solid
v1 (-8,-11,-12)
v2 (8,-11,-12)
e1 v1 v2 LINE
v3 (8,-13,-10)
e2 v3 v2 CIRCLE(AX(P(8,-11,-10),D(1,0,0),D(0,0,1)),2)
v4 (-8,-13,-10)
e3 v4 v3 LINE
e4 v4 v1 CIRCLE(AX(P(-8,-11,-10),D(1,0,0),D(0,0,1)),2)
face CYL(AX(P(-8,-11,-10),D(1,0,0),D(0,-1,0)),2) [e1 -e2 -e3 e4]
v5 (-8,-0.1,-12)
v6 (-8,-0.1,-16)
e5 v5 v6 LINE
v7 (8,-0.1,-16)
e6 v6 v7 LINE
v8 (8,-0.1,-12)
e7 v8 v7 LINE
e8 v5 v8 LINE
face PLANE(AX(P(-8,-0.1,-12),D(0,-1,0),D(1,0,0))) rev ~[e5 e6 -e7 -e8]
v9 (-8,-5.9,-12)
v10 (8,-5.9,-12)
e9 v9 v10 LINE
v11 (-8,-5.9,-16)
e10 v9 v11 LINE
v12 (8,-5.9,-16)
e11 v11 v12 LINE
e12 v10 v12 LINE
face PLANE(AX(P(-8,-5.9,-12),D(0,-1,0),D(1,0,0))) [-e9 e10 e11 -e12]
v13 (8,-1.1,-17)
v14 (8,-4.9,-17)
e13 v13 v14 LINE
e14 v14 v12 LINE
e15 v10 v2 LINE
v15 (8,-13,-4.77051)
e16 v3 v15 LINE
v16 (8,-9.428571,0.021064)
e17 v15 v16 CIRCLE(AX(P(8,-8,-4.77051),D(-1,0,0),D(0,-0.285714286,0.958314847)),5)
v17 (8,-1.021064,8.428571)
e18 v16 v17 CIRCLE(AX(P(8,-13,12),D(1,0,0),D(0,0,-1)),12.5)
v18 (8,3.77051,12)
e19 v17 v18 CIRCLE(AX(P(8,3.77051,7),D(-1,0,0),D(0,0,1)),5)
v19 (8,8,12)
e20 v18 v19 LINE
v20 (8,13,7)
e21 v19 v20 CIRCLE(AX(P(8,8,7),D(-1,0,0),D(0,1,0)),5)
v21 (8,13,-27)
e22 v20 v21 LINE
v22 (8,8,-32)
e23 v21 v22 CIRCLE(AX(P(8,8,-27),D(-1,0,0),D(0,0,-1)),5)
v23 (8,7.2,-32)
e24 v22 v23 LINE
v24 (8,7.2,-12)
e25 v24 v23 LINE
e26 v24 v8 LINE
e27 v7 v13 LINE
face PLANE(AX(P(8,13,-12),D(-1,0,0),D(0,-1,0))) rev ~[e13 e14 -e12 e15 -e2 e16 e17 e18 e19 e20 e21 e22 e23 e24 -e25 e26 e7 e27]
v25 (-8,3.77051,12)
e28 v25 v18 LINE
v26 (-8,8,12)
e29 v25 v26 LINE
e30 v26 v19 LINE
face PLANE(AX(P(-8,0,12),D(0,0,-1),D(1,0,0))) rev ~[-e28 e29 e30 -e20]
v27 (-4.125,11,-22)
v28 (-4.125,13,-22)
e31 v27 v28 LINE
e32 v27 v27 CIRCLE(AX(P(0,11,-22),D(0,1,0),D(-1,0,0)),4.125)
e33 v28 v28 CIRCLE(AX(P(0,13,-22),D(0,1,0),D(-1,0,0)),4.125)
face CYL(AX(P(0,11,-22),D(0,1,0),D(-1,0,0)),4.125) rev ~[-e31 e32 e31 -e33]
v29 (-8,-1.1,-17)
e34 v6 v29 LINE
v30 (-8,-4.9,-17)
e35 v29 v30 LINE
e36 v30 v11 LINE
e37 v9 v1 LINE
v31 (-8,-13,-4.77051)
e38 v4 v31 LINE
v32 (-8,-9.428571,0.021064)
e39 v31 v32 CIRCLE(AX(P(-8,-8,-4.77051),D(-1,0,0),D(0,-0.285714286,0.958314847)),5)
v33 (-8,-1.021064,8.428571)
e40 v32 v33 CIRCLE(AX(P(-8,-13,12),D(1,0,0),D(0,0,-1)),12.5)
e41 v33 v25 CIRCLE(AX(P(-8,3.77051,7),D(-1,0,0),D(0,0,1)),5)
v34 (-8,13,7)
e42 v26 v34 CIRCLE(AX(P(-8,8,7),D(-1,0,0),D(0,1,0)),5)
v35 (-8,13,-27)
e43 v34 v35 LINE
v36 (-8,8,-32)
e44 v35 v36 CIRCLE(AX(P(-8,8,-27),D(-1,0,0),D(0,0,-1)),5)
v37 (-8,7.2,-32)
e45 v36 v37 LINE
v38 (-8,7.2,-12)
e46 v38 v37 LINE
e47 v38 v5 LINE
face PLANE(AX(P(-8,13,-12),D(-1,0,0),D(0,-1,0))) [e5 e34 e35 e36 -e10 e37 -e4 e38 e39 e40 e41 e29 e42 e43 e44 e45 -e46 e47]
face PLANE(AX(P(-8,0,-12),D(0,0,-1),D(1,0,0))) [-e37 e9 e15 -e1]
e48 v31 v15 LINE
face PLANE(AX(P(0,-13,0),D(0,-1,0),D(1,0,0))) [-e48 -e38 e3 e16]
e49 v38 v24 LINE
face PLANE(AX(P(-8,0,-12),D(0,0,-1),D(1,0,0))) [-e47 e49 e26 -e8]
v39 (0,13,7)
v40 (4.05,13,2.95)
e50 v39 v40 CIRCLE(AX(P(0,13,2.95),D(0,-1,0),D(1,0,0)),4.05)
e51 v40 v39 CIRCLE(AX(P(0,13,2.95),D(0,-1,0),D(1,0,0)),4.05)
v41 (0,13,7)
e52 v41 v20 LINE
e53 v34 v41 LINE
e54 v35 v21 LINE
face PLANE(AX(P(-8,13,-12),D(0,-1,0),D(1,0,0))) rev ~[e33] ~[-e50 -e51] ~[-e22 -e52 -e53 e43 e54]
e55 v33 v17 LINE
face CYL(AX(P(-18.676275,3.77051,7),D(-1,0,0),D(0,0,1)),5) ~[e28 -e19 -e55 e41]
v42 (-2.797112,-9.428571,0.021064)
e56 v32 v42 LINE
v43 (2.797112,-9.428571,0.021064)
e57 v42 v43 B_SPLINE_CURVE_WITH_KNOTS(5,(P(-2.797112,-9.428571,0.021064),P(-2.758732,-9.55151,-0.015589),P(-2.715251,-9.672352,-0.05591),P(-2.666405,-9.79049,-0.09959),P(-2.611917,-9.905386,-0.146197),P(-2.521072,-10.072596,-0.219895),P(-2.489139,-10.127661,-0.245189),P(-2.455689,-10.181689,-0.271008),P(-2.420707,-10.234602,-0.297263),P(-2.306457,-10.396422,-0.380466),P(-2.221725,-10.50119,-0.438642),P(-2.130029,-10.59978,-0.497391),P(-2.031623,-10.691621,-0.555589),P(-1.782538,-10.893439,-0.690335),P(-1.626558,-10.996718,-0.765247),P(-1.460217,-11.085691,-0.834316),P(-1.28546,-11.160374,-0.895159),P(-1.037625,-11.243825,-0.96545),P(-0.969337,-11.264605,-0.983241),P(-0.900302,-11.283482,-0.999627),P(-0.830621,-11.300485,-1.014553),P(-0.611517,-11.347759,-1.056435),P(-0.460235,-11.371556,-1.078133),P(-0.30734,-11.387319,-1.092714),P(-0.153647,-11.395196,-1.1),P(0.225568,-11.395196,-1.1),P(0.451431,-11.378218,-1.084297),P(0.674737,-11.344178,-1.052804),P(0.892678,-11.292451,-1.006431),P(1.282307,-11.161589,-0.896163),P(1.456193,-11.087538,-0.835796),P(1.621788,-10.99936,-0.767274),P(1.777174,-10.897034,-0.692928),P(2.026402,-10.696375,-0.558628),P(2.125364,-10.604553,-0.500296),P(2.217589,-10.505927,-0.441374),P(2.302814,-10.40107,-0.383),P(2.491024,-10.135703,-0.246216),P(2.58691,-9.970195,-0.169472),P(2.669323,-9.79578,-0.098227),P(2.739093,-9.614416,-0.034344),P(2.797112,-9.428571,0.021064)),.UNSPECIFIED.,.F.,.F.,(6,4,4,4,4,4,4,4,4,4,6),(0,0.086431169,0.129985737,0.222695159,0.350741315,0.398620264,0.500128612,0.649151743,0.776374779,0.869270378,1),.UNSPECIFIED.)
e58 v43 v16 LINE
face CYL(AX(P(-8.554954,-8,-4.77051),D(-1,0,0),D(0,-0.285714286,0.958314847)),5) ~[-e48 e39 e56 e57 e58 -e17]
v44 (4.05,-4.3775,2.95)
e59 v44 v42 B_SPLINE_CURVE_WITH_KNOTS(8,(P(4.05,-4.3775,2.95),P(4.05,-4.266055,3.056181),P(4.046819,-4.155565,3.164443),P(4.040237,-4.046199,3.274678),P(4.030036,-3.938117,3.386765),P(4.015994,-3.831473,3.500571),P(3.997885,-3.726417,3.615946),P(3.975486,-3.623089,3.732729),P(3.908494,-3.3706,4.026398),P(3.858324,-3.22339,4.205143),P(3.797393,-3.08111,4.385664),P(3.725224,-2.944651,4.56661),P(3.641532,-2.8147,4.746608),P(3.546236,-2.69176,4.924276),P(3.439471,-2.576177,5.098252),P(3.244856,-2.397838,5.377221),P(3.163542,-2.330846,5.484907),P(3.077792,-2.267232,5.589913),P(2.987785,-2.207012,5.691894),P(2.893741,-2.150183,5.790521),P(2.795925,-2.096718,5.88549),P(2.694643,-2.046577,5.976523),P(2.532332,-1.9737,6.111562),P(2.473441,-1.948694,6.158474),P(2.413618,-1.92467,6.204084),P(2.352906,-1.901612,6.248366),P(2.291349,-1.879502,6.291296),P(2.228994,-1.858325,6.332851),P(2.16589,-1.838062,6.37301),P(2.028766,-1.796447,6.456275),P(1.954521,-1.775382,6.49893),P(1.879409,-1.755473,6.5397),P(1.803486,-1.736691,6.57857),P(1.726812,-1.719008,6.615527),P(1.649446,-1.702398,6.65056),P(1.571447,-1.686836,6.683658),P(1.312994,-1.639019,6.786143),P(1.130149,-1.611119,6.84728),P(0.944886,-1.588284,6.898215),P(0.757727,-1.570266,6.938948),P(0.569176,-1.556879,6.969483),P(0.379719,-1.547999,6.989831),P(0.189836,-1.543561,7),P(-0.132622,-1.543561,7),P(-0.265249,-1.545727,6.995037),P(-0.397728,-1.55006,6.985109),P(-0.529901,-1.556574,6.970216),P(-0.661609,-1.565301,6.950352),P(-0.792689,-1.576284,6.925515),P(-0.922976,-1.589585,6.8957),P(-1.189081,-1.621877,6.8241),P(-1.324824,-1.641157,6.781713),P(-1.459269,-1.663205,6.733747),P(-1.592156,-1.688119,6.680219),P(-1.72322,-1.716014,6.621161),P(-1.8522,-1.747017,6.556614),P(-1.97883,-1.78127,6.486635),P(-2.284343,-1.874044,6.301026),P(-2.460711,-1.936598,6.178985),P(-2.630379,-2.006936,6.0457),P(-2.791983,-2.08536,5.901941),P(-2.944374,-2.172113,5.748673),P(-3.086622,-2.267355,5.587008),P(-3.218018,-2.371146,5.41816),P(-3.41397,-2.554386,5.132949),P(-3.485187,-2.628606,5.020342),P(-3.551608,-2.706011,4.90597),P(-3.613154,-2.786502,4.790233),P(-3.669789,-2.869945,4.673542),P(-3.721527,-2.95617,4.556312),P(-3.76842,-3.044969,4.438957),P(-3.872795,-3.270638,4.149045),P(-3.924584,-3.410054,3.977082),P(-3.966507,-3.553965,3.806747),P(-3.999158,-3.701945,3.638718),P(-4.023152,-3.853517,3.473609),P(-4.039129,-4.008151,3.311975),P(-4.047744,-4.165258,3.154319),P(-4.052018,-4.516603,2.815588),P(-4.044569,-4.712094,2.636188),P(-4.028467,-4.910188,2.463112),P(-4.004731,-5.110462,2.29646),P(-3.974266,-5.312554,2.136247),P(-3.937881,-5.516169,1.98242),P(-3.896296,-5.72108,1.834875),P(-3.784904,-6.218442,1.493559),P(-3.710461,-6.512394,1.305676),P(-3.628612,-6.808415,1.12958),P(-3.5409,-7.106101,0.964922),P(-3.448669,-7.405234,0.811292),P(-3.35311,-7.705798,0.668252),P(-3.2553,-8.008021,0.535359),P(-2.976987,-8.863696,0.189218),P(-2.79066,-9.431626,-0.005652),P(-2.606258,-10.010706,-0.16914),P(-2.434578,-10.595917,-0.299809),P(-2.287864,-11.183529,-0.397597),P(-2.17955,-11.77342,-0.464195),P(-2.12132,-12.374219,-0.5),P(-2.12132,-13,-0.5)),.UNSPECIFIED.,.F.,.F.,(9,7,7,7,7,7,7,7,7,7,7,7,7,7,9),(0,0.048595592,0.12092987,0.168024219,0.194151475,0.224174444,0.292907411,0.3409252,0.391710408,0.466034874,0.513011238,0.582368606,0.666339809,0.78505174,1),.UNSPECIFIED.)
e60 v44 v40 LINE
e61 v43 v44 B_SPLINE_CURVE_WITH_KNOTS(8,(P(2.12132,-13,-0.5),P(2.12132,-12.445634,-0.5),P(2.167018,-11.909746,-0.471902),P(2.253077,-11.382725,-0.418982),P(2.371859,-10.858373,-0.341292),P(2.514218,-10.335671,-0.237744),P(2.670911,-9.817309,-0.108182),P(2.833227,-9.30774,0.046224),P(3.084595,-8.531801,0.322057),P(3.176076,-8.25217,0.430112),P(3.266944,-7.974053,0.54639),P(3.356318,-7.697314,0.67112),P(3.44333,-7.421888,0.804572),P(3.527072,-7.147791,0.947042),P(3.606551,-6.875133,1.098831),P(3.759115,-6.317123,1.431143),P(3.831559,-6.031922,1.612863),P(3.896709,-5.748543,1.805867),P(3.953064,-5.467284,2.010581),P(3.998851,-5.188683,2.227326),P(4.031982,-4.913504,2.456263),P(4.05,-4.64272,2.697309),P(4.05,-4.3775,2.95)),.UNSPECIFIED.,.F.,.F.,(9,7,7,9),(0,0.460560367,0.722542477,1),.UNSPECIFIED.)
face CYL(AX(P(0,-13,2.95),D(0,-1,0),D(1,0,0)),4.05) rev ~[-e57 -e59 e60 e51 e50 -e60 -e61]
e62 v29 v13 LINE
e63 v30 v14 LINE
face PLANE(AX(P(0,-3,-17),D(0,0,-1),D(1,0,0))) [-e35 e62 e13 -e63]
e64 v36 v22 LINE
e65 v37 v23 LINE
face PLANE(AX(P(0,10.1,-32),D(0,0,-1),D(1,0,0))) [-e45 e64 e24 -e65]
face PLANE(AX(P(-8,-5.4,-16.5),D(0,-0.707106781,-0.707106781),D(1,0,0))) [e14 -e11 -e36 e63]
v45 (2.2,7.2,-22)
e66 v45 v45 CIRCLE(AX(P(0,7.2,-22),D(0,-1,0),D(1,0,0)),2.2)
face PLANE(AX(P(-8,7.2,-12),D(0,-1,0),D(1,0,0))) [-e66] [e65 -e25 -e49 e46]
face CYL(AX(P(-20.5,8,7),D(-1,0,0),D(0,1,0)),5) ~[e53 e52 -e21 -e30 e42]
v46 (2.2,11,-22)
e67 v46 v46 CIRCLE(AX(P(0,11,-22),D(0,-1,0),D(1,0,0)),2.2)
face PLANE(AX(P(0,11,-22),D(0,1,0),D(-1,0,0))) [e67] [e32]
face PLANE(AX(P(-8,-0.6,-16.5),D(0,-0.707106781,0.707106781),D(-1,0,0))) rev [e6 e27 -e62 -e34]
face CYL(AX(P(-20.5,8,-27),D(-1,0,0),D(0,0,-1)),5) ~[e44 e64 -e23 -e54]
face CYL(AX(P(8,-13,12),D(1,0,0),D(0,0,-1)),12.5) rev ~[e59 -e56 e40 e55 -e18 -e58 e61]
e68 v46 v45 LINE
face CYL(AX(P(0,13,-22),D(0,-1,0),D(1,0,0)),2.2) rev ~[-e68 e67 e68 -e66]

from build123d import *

# Parameters (mm, degrees)
F0_W           = 16
F0_H           = 24
F1_DEPTH       = 13
F2_W           = 16
F2_H           = 5.8
F3_DEPTH       = 5
F4_DEPTH       = 20
F5_R           = 4.05
F6_DEPTH       = 26.001
F8_D           = 4.4
F8_CBORE_D     = 8.25
F8_CBORE_DEPTH = 2
F9_SIZE        = 1
F11_DEPTH      = 16.001
F12_T1_DEPTH   = 27.2312288127
F12_T3_DEPTH   = 27.2312288127
F12_T5_DEPTH   = 41
F12_T7_DEPTH   = 37.3525491562
F13_R          = 2


# Not quite as in the source:
# - a fillet or chamfer that OpenCascade refuses, or shapes differently, is made with other operations: its cross-section is extruded or revolved along the edge and cut away or added
# - a feature names something its author has since deleted; it is built from what else it names


with BuildPart() as f1:
    # F0 (on Front) → F1 (new body, symmetric)
    with BuildSketch(Plane.XZ):
        Rectangle(F0_W, F0_H)
    extrude(amount=F1_DEPTH, both=True)

    # F2 (on face) → F3 (join)
    with BuildSketch(Plane(origin=(0, 0, -12), x_dir=(1, 0, 0), z_dir=(0, 0, -1))):
        with Locations((0, 3)):
            Rectangle(F2_W, F2_H)
    extrude(amount=F3_DEPTH)

    # F2 (on face) → F4 (join)
    with BuildSketch(Plane(origin=(0, 0, -12), x_dir=(1, 0, 0), z_dir=(0, 0, -1))):
        with Locations((0, -10.1)):
            Rectangle(F2_W, F2_H)
    extrude(amount=F4_DEPTH)

    # F5 (on face) → F6 (cut, through all)
    with BuildSketch(Plane.XZ.offset(13)):
        with Locations((0, 2.95)):
            Circle(F5_R)
    extrude(amount=-F6_DEPTH, mode=Mode.SUBTRACT)

    # F8 (through all)
    with Locations(Plane(origin=(0, 13, 0), x_dir=(-1, 0, 0), z_dir=(0, 1, 0))):
        with Locations((0, -22)):
            CounterBoreHole(F8_D / 2, F8_CBORE_D / 2, F8_CBORE_DEPTH)

    # F9
    f9_edges = [f1.edges().sort_by_distance(p)[0] for p in [
        (0, -5.9, -17),
        (0, -0.1, -17),
    ]]
    chamfer(f9_edges, length=F9_SIZE)

    # F10 (on face) → F11 (cut, through all)
    with BuildSketch(Plane.YZ.offset(8)):
        with BuildLine():
            Line((-13, 12), (-0.5, 12))
            ThreePointArc((-0.5, 12), (-21.8388347648, 20.8388347648), (-13, -0.5))
            Line((-13, -0.5), (-13, 12))
        make_face()
        with BuildLine():
            ThreePointArc((-13, -0.5), (-4.1611652352, 3.1611652352), (-0.5, 12))
            Line((-0.5, 12), (-13, 12))
            Line((-13, 12), (-13, -0.5))
        make_face()
    extrude(amount=-F11_DEPTH, mode=Mode.SUBTRACT)

    # F12: fillet of radius 5 on 5 edges, made by hand

    # F12_s2 → F12_t1 (cut)
    with BuildSketch(Plane.YZ.offset(-8.5549542346)):
        with BuildLine():
            ThreePointArc((-9.4285714286, 0.0210644063), (-12.0089186287, -1.7824383079), (-13, -4.7705098312))
            Line((-13, -4.7705098312), (-13, -0.5))
            ThreePointArc((-13, -0.5), (-11.1953802231, -0.369047961), (-9.4285714286, 0.0210644063))
        make_face()
    extrude(amount=F12_T1_DEPTH, mode=Mode.SUBTRACT)

    # F12_s4 → F12_t3 (cut)
    with BuildSketch(Plane.YZ.offset(-18.6762745781)):
        with BuildLine():
            ThreePointArc((-9.4285714286, 0.0210644063), (-12.0089186287, -1.7824383079), (-13, -4.7705098312))
            Line((-13, -4.7705098312), (-13, -0.5))
            ThreePointArc((-13, -0.5), (-11.1953802231, -0.369047961), (-9.4285714286, 0.0210644063))
        make_face()
    extrude(amount=F12_T3_DEPTH, mode=Mode.SUBTRACT)

    # F12_s6 → F12_t5 (cut)
    with BuildSketch(Plane.YZ.offset(-20.5)):
        with BuildLine():
            ThreePointArc((8, -32), (11.5355339059, -30.5355339059), (13, -27))
            Line((13, -27), (13, -32))
            Line((13, -32), (8, -32))
        make_face()
        with BuildLine():
            ThreePointArc((13, 7), (11.5355339059, 10.5355339059), (8, 12))
            Line((8, 12), (13, 12))
            Line((13, 12), (13, 7))
        make_face()
    extrude(amount=F12_T5_DEPTH, mode=Mode.SUBTRACT)

    # F12_s8 → F12_t7 (cut)
    with BuildSketch(Plane.YZ.offset(-18.6762745781)):
        with BuildLine():
            ThreePointArc((3.7705098312, 12), (0.7824383079, 11.0089186287), (-1.0210644063, 8.4285714286))
            ThreePointArc((-1.0210644063, 8.4285714286), (-0.630952039, 10.1953802231), (-0.5, 12))
            Line((-0.5, 12), (3.7705098312, 12))
        make_face()
    extrude(amount=F12_T7_DEPTH, mode=Mode.SUBTRACT)

    # F13
    f13_edges = [f1.edges().sort_by_distance(p)[0] for p in [
        (0, -13, -12),
    ]]
    fillet(f13_edges, radius=F13_R)


solid = f1.part
